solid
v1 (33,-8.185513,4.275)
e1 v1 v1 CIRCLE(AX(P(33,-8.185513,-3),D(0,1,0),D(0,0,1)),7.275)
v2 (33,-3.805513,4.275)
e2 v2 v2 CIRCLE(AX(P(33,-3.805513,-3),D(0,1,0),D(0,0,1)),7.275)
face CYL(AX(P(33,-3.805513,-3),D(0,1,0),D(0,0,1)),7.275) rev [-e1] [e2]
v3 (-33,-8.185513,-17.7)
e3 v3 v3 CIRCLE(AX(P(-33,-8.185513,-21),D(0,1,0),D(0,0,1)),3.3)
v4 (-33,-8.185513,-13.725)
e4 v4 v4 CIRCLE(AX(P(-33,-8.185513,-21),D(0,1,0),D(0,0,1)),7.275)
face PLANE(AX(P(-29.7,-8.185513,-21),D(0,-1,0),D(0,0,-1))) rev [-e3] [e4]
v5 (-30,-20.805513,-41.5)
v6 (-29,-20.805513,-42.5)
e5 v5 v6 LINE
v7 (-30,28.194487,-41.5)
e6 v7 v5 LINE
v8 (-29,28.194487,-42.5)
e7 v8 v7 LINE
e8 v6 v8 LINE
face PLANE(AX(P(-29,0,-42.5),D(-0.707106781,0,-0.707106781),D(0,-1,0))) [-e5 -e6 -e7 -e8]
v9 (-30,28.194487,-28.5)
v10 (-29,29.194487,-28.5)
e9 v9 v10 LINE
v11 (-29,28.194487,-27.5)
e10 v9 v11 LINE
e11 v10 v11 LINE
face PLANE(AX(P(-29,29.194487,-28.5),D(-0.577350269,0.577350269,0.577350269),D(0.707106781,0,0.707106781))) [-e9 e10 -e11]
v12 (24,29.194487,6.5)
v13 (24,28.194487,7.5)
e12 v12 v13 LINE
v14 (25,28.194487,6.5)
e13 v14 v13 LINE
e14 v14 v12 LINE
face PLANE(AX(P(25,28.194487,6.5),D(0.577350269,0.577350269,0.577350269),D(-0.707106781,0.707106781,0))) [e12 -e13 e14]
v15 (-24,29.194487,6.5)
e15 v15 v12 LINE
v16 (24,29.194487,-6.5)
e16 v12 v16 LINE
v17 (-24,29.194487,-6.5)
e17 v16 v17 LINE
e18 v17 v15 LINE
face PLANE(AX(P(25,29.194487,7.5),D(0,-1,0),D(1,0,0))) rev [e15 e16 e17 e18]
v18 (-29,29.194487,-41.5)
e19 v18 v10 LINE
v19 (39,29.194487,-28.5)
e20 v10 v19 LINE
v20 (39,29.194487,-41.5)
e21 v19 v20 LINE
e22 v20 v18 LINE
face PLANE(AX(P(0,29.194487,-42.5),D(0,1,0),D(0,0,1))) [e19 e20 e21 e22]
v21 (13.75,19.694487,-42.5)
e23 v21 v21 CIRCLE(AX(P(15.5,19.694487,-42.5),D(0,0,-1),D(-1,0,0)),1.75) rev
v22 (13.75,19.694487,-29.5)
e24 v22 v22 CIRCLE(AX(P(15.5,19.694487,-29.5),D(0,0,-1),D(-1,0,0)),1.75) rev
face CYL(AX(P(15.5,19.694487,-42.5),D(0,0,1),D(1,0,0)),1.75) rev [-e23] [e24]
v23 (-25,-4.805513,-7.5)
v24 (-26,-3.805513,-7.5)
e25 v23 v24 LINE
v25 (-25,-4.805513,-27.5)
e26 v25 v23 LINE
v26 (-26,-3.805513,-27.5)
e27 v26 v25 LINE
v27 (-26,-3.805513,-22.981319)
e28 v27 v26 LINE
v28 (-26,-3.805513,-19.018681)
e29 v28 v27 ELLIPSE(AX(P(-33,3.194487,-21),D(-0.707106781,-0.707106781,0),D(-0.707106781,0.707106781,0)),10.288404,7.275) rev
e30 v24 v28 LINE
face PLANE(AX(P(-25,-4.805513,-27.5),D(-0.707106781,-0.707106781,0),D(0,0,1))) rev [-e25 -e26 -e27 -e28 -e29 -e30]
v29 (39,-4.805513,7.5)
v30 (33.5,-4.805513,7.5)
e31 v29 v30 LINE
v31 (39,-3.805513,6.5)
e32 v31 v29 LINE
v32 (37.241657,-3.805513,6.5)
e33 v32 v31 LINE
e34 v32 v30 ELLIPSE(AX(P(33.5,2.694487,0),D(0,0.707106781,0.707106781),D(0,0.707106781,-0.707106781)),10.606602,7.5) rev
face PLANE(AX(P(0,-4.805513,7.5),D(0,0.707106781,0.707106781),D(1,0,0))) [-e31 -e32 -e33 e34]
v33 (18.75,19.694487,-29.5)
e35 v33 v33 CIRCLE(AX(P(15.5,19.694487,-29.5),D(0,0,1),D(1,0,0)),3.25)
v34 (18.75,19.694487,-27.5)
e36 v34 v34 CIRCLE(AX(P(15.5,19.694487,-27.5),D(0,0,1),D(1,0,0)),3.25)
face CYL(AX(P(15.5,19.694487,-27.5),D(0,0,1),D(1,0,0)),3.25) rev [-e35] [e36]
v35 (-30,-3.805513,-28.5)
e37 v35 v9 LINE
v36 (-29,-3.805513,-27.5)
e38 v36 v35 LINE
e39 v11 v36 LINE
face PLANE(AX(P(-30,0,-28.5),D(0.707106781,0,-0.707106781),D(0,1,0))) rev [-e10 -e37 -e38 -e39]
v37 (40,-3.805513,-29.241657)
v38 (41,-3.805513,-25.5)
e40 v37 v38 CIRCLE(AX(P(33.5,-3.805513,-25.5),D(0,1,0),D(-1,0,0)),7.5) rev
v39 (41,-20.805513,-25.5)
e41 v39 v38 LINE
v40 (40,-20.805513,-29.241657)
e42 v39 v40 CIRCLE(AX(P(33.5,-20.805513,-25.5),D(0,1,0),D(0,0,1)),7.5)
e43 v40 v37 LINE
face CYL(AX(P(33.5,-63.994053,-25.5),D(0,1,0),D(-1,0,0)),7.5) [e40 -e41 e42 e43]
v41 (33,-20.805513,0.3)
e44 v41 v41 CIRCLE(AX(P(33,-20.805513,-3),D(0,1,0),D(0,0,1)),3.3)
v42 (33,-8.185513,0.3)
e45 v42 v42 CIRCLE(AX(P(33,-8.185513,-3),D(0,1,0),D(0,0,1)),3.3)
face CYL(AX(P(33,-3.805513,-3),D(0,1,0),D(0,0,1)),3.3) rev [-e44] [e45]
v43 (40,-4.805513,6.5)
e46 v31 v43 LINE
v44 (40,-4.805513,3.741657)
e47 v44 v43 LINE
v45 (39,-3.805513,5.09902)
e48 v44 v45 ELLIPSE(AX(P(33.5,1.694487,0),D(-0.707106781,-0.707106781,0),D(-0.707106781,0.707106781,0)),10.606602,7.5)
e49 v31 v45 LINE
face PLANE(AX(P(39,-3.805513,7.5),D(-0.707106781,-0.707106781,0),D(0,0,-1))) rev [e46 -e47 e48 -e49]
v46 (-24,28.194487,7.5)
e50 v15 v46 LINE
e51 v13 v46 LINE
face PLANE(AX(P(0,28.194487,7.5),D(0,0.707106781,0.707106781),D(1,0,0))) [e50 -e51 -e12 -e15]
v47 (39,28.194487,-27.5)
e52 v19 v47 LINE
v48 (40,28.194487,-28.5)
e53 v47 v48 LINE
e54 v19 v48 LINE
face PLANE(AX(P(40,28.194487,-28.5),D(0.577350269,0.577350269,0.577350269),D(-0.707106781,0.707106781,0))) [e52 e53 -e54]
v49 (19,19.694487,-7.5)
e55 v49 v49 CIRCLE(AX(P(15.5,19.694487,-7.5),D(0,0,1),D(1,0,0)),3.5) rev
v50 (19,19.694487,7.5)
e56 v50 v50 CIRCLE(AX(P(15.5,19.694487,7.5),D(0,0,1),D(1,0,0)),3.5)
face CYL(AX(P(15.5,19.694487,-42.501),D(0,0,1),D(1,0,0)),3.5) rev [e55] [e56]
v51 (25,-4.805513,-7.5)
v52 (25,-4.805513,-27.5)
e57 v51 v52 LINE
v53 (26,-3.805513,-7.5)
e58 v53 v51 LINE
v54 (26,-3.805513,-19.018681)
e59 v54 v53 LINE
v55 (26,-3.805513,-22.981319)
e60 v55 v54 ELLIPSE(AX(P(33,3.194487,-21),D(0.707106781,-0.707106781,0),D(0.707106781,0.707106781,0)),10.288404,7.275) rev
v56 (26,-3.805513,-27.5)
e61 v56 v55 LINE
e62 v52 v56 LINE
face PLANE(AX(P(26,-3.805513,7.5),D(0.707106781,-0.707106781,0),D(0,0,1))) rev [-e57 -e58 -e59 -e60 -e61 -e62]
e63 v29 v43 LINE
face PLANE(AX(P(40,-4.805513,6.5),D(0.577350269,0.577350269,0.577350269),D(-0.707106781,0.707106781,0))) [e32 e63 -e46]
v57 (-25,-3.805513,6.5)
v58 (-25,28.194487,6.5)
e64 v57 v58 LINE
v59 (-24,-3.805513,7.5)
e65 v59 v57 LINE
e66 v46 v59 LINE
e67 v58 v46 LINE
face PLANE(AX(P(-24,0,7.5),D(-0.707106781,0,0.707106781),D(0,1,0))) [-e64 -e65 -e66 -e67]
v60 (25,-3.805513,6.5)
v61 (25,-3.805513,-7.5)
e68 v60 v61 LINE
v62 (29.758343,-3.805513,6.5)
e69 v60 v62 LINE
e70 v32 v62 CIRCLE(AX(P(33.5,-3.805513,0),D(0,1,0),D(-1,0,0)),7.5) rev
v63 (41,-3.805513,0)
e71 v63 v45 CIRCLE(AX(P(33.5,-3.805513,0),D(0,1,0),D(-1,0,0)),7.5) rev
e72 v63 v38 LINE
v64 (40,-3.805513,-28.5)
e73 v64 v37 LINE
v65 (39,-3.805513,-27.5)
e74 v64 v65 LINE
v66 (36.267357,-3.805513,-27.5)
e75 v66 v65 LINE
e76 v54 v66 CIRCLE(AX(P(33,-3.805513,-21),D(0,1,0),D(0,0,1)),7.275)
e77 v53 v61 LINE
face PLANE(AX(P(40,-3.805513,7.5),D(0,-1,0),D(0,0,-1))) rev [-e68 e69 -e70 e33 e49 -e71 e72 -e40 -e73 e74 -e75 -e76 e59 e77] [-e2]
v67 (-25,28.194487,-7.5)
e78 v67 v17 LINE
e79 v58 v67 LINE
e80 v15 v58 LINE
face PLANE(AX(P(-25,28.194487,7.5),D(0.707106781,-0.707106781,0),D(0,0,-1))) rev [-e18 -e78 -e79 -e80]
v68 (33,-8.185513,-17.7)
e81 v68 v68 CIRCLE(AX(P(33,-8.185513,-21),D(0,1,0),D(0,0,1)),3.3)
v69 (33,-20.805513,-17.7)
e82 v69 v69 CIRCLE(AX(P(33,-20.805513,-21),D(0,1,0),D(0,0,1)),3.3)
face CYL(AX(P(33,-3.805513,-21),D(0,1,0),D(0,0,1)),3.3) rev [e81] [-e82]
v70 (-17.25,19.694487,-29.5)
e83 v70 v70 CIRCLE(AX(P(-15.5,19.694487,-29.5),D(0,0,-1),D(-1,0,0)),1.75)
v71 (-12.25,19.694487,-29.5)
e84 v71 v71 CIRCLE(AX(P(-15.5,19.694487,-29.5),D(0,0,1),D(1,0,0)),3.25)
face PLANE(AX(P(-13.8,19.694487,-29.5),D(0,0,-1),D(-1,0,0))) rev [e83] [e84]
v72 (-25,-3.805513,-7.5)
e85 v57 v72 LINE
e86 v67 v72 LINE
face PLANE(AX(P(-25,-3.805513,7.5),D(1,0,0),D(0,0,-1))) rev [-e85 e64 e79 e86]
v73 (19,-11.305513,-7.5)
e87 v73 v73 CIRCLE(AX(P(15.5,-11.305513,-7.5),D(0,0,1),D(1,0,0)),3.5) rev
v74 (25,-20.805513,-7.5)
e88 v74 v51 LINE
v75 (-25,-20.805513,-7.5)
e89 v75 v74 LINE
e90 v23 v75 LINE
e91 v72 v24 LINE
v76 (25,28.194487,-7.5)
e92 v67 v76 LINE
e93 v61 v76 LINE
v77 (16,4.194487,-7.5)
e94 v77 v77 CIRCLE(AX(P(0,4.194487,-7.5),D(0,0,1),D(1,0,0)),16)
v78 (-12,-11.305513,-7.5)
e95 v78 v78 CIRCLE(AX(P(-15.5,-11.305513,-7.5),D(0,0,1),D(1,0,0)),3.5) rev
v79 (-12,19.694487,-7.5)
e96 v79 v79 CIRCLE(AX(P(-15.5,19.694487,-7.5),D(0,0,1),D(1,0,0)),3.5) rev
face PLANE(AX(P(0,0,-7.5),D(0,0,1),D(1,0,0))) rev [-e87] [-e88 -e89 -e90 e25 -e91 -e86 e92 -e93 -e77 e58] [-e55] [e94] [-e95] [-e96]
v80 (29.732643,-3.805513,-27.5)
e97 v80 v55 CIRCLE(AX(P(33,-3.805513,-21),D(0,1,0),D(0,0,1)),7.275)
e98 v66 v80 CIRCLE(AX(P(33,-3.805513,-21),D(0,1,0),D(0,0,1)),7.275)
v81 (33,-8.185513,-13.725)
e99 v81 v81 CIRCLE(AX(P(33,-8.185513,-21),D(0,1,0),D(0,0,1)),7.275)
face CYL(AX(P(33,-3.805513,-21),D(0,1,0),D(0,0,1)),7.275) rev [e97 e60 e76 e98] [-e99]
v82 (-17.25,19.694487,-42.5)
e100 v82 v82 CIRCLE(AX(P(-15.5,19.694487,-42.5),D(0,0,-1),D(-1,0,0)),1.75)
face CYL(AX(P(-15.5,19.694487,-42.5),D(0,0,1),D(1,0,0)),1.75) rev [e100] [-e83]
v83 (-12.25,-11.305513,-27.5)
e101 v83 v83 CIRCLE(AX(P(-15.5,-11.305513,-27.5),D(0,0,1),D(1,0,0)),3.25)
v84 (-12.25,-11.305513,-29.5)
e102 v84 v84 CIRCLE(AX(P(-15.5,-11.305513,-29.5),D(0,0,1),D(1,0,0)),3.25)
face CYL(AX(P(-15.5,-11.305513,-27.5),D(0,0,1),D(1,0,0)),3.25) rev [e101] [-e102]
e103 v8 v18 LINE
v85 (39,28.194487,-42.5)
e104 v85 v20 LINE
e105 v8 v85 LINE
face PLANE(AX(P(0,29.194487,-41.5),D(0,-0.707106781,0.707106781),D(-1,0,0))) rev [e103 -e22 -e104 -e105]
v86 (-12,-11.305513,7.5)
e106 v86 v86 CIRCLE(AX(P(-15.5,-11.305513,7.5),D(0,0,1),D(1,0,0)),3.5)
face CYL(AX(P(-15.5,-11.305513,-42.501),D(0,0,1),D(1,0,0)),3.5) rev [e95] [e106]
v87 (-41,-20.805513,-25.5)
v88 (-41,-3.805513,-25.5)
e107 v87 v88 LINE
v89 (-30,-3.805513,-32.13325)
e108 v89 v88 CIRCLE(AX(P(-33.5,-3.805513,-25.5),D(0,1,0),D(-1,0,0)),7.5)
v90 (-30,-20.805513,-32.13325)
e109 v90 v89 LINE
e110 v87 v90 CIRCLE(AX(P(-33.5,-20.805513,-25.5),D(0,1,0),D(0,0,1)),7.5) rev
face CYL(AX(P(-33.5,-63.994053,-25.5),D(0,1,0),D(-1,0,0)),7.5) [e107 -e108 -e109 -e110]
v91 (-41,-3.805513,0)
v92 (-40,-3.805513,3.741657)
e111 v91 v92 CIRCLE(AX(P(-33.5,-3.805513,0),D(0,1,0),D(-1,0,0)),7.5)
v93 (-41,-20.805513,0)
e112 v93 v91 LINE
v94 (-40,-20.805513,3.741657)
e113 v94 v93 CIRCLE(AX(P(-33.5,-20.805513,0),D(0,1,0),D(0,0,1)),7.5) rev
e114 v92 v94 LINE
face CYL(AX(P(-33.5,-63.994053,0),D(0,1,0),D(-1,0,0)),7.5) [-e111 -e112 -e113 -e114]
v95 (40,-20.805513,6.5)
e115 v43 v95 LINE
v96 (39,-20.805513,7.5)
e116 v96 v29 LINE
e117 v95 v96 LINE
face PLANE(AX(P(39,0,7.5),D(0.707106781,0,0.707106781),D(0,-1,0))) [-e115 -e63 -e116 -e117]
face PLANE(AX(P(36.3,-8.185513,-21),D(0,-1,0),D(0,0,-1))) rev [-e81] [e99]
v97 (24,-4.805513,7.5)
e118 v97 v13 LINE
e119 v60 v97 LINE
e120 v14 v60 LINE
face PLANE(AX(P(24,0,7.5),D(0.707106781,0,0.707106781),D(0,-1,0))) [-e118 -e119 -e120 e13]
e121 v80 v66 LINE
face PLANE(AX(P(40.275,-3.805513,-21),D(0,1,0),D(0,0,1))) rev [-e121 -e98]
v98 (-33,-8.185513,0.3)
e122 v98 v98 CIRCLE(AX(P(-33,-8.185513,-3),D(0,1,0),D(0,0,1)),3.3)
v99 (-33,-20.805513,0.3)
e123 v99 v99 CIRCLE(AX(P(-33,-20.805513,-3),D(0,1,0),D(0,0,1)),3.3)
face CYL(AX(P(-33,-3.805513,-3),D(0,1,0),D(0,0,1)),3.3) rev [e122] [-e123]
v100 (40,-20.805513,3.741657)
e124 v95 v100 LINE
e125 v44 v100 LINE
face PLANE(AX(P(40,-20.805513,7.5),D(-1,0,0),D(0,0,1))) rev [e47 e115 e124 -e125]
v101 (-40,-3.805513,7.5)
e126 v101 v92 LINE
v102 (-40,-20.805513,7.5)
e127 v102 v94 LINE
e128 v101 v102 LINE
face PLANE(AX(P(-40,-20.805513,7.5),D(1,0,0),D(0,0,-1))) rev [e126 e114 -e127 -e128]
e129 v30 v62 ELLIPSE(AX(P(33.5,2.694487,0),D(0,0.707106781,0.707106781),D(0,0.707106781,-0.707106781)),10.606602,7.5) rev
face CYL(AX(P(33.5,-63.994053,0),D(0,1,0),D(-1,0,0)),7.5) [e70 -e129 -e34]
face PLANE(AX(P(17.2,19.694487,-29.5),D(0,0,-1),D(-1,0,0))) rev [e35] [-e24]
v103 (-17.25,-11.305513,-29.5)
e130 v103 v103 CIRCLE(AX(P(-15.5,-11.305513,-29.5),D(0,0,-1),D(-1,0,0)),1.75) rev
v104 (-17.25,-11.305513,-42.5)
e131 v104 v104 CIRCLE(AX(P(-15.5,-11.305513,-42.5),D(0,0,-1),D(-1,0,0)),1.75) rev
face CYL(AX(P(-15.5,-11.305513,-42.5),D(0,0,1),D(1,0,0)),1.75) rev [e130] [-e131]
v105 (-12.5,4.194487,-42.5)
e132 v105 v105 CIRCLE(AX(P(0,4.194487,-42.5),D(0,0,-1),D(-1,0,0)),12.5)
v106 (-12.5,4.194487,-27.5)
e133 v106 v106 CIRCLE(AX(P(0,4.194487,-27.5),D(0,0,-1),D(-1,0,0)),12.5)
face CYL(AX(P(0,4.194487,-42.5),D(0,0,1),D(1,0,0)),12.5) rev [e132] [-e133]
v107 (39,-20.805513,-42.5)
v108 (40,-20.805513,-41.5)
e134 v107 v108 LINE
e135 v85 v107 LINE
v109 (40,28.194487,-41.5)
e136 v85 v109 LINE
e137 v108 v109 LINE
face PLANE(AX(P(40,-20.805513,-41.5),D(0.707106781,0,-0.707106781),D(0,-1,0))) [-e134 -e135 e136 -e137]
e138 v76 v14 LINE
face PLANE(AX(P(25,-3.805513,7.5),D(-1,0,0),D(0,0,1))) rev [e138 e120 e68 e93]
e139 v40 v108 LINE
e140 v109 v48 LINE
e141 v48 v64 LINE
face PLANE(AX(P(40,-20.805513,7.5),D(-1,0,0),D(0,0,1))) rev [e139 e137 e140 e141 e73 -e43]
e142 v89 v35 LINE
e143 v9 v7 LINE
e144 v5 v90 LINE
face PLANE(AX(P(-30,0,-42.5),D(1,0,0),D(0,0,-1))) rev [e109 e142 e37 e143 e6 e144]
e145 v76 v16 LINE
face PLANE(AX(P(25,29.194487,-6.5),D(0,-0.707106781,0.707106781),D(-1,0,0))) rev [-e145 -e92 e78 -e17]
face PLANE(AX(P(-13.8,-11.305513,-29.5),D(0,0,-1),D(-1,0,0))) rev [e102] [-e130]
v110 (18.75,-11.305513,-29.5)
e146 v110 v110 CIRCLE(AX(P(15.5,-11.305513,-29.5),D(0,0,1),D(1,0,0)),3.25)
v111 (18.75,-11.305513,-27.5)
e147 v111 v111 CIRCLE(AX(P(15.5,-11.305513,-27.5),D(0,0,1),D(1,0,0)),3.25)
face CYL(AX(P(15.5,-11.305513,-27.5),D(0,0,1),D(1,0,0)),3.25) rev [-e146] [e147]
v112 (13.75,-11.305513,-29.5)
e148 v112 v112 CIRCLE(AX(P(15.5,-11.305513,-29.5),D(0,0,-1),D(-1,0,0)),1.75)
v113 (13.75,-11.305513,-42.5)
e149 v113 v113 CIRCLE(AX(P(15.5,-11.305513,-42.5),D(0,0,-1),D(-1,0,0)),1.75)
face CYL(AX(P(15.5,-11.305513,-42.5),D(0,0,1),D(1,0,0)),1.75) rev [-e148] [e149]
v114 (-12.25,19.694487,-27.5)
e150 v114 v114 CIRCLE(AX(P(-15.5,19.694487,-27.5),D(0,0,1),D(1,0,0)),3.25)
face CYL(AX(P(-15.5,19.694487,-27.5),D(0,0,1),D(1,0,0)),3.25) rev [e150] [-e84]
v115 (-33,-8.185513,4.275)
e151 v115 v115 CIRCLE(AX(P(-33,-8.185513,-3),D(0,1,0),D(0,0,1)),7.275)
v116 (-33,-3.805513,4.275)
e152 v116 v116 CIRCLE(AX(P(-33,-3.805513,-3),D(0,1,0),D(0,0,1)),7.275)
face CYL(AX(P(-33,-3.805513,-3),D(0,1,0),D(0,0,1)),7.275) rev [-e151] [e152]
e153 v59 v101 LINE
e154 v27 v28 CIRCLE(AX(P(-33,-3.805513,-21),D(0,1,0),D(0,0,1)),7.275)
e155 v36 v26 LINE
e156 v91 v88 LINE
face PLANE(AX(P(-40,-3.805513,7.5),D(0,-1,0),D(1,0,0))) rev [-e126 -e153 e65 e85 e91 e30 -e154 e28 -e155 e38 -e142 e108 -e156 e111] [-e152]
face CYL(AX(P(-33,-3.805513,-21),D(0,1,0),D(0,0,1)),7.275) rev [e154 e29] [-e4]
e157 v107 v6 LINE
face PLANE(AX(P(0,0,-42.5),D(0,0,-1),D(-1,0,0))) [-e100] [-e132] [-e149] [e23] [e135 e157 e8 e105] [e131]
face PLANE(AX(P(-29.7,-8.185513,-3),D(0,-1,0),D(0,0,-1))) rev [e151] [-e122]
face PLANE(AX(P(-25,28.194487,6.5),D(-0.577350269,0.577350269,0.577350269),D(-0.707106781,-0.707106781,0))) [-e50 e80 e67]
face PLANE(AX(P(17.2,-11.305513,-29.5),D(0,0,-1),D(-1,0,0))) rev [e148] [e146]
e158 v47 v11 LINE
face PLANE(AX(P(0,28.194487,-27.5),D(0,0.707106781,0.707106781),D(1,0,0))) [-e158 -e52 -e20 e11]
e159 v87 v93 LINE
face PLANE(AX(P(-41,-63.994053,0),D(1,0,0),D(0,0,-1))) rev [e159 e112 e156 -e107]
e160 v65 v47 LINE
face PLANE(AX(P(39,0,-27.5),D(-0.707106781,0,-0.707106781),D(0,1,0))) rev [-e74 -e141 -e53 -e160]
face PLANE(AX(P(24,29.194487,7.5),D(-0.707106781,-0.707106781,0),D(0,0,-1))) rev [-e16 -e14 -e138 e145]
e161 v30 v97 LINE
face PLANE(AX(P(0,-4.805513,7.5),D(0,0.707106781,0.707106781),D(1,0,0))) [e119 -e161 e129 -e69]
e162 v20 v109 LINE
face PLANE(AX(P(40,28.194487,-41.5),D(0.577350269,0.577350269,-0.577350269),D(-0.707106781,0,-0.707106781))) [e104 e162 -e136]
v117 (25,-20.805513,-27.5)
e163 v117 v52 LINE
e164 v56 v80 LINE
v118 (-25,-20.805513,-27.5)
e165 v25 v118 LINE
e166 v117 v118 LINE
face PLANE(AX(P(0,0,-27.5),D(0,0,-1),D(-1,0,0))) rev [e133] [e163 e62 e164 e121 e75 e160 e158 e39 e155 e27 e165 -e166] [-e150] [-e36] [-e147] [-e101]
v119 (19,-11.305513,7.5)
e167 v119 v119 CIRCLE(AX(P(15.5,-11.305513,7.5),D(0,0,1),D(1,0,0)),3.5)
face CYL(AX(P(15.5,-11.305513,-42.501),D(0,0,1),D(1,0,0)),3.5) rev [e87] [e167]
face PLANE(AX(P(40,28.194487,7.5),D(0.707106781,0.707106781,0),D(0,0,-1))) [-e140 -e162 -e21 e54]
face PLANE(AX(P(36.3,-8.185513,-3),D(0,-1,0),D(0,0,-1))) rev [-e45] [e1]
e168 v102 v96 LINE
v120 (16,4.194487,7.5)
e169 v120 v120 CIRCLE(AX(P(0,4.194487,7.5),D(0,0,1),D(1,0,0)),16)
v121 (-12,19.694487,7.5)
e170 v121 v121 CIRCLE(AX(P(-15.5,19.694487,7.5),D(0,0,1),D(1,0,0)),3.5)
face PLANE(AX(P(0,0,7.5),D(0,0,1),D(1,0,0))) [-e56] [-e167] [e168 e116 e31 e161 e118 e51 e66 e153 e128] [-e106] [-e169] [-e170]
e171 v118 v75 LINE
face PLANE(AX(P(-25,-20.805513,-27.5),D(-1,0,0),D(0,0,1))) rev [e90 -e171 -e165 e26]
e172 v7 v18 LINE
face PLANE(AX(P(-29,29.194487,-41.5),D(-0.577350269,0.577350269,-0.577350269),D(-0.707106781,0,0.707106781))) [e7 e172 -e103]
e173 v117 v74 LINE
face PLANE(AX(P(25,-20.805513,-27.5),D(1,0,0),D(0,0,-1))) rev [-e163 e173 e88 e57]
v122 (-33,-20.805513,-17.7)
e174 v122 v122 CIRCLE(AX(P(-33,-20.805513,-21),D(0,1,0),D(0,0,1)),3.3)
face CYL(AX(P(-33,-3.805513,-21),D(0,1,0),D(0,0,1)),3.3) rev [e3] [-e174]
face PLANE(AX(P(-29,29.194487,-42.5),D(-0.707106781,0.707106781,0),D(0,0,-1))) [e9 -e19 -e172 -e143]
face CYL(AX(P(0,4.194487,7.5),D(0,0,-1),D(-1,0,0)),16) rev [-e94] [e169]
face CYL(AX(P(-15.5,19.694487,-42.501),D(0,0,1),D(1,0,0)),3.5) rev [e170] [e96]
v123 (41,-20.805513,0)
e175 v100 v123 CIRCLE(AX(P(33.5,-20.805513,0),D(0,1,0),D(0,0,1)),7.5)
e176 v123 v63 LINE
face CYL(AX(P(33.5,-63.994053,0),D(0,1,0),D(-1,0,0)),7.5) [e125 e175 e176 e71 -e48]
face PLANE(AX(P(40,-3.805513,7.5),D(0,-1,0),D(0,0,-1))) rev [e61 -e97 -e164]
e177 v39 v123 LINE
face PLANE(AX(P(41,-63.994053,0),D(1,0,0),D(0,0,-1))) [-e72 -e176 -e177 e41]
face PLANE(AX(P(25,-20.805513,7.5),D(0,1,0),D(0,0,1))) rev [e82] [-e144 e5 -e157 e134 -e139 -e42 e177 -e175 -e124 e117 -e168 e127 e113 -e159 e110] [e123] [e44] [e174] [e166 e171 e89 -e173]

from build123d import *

# Parameters (mm, degrees)
SKETCH1_R                                   = 16
BOSS_EXTRUDE1_DEPTH                         = 7.5
SKETCH2_W                                   = 15
SKETCH2_H                                   = 17
BOSS_EXTRUDE2_DEPTH                         = 20
SKETCH3_W                                   = 70
SKETCH3_H                                   = 50
SKETCH3_R                                   = 12.5
SKETCH3_R_2                                 = 1.75
BOSS_EXTRUDE4_DEPTH                         = 15
CHAMFER1_SIZE                               = 1
CUT_EXTRUDE1_REACH                          = 72.373
SKETCH4_R                                   = 3.5
CBORE_FOR_M3_CHEESE_HEAD_SCREW3_D           = 3.4
CBORE_FOR_M3_CHEESE_HEAD_SCREW3_CBORE_D     = 6.5
CBORE_FOR_M3_CHEESE_HEAD_SCREW3_CBORE_DEPTH = 2
BOSS_EXTRUDE5_START                         = -17
BOSS_EXTRUDE5_DEPTH                         = 17
CBORE_FOR_M6_HEX_HEAD_BOLT1_AT_2_COUNT      = 2
CBORE_FOR_M6_HEX_HEAD_BOLT1_AT_2_PITCH      = 18
CBORE_FOR_M6_HEX_HEAD_BOLT1_AT_3_COUNT      = 2
CBORE_FOR_M6_HEX_HEAD_BOLT1_AT_3_PITCH      = 68.410525506
CBORE_FOR_M6_HEX_HEAD_BOLT1_AT_4_COUNT      = 2
CBORE_FOR_M6_HEX_HEAD_BOLT1_AT_4_PITCH      = 66


# Read off the part's stored shape, not the designer's step: Boss-Extrude5
with BuildPart() as part:
    # Sketch1 → Boss-Extrude1 (new, symmetric)
    with BuildSketch(Plane.XY):
        Polygon((-25, -20.805513048), (-40, -20.805513048), (-40, -3.805513048), (-25, -3.805513048), (-25, 29.194486952), (25, 29.194486952), (25, -3.805513048), (40, -3.805513048), (40, -20.805513048), (25, -20.805513048), align=None)
        with Locations((0, 4.194486952)):
            Circle(SKETCH1_R, mode=Mode.SUBTRACT)
    extrude(amount=BOSS_EXTRUDE1_DEPTH, both=True)

    # Sketch2 → Boss-Extrude2 (add)
    with BuildSketch(Plane(origin=(0, 0, -7.5), x_dir=(-1, 0, 0), z_dir=(0, 0, -1))):
        with Locations((32.5, -12.305513048)):
            Rectangle(SKETCH2_W, SKETCH2_H)
        with Locations((-32.5, -12.305513048)):
            Rectangle(SKETCH2_W, SKETCH2_H)
    extrude(amount=BOSS_EXTRUDE2_DEPTH)

    # Sketch3 → Boss-Extrude4 (add)
    with BuildSketch(Plane(origin=(0, 0, -27.5), x_dir=(-1, 0, 0), z_dir=(0, 0, -1))):
        with Locations((-5, 4.194486952)):
            Rectangle(SKETCH3_W, SKETCH3_H)
        with Locations((0, 4.194486952)):
            Circle(SKETCH3_R, mode=Mode.SUBTRACT)
        with Locations((15.5, 19.694486952)):
            Circle(SKETCH3_R_2, mode=Mode.SUBTRACT)
        with Locations((-15.5, 19.694486952)):
            Circle(SKETCH3_R_2, mode=Mode.SUBTRACT)
        with Locations((15.5, -11.305513048)):
            Circle(SKETCH3_R_2, mode=Mode.SUBTRACT)
        with Locations((-15.5, -11.305513048)):
            Circle(SKETCH3_R_2, mode=Mode.SUBTRACT)
    extrude(amount=BOSS_EXTRUDE4_DEPTH)

    # Chamfer1
    chamfer1_edges = [part.edges().sort_by_distance(p)[0] for p in [
        (0, 29.194486952, -7.5),
        (-25, 29.194486952, 0),
        (25, 29.194486952, 0),
        (40, -3.805513048, -10),
        (40, -12.305513048, 7.5),
        (32.5, -3.805513048, 7.5),
        (25, 12.694486952, 7.5),
        (-25, -3.805513048, -17.5),
        (0, 29.194486952, 7.5),
        (25, -3.805513048, -17.5),
        (-25, 12.694486952, 7.5),
        (40, 12.694486952, -27.5),
        (5, 29.194486952, -27.5),
        (40, 4.194486952, -42.5),
        (40, 29.194486952, -35),
        (-30, 12.694486952, -27.5),
        (5, 29.194486952, -42.5),
        (-30, 29.194486952, -35),
        (-30, 4.194486952, -42.5),
    ]]
    chamfer(chamfer1_edges, length=CHAMFER1_SIZE)

    # Sketch4 → Cut-Extrude1 (cut, up to next)
    with BuildSketch(Plane.XY.offset(7.5), mode=Mode.PRIVATE) as cut_extrude1_sk1:
        with Locations((-15.5, 19.694486952)):
            Circle(SKETCH4_R)
    cut_extrude1_tool1 = extrude(cut_extrude1_sk1.sketch, amount=-CUT_EXTRUDE1_REACH, mode=Mode.PRIVATE) & part.part
    # Sketch4 → Cut-Extrude1 (cut, up to next)
    with BuildSketch(Plane.XY.offset(7.5), mode=Mode.PRIVATE) as cut_extrude1_sk2:
        with Locations((-15.5, -11.305513048)):
            Circle(SKETCH4_R)
    cut_extrude1_tool2 = extrude(cut_extrude1_sk2.sketch, amount=-CUT_EXTRUDE1_REACH, mode=Mode.PRIVATE) & part.part
    # Sketch4 → Cut-Extrude1 (cut, up to next)
    with BuildSketch(Plane.XY.offset(7.5), mode=Mode.PRIVATE) as cut_extrude1_sk3:
        with Locations((15.5, -11.305513048)):
            Circle(SKETCH4_R)
    cut_extrude1_tool3 = extrude(cut_extrude1_sk3.sketch, amount=-CUT_EXTRUDE1_REACH, mode=Mode.PRIVATE) & part.part
    # Sketch4 → Cut-Extrude1 (cut, up to next)
    with BuildSketch(Plane.XY.offset(7.5), mode=Mode.PRIVATE) as cut_extrude1_sk4:
        with Locations((15.5, 19.694486952)):
            Circle(SKETCH4_R)
    cut_extrude1_tool4 = extrude(cut_extrude1_sk4.sketch, amount=-CUT_EXTRUDE1_REACH, mode=Mode.PRIVATE) & part.part
    add(cut_extrude1_tool1.solids().sort_by_distance((-15.5, 19.694487, 7.5))[0], mode=Mode.SUBTRACT)
    add(cut_extrude1_tool2.solids().sort_by_distance((-15.5, -11.305513, 7.5))[0], mode=Mode.SUBTRACT)
    add(cut_extrude1_tool3.solids().sort_by_distance((15.5, -11.305513, 7.5))[0], mode=Mode.SUBTRACT)
    add(cut_extrude1_tool4.solids().sort_by_distance((15.5, 19.694487, 7.5))[0], mode=Mode.SUBTRACT)

    # CBORE for M3 Cheese Head Screw3 (through all)
    with Locations(Plane(origin=(-15.5, 19.694486952, -27.5), x_dir=(1, 0, 0), z_dir=(0, 0, 1))):
        with Locations((0, 0), (31, 0), (0, -31), (31, -31)):
            CounterBoreHole(CBORE_FOR_M3_CHEESE_HEAD_SCREW3_D / 2, CBORE_FOR_M3_CHEESE_HEAD_SCREW3_CBORE_D / 2, CBORE_FOR_M3_CHEESE_HEAD_SCREW3_CBORE_DEPTH)

    # Boss-Extrude5 outline → Boss-Extrude5 (add)
    with BuildSketch(Plane(origin=(0, -3.805513048, 0), x_dir=(1, 0, 0), z_dir=(0, 1, 0)).offset(BOSS_EXTRUDE5_START)):
        with BuildLine():
            Line((-40, -3.741657387), (-40, 27.5))
            Line((-40, 27.5), (-30, 27.5))
            Line((-30, 27.5), (-30, 32.133249581))
            ThreePointArc((-30, 32.133249581), (-37.372983346, 31.922616289), (-41, 25.5))
            Line((-41, 25.5), (-41, 0))
            ThreePointArc((-41, 0), (-40.745688373, -1.936491673), (-40, -3.741657387))
        make_face()
        with BuildLine():
            Line((41, 0), (41, 25.5))
            ThreePointArc((41, 25.5), (28.196699141, 30.803300859), (33.5, 18))
            Line((33.5, 18), (33.5, 7.5))
            ThreePointArc((33.5, 7.5), (26.254311627, 1.936491673), (29.758342613, -6.5))
            ThreePointArc((29.758342613, -6.5), (33.5, -7.5), (37.241657387, -6.5))
            ThreePointArc((37.241657387, -6.5), (39.992781777, -3.754168989), (41, 0))
        make_face()
    extrude(amount=BOSS_EXTRUDE5_DEPTH)

    # Sketch9 → CBORE for M6 Hex Head Bolt1 (revolve, cut)
    with BuildSketch(Plane(origin=(-33, -3.805513048, -3), x_dir=(0, 0, 1), z_dir=(1, 0, 0))):
        Polygon((0, 0), (0, 17), (3.3, 17), (3.3, 4.38), (7.275, 4.38), (7.275, 0), align=None)
    cbore_for_m6_hex_head_bolt1 = revolve(axis=Axis((-33, 2.544486952, -3), (0, -1, 0)), mode=Mode.SUBTRACT)

    # CBORE for M6 Hex Head Bolt1 at 2: CBORE for M6 Hex Head Bolt1 ×2
    with Locations(*[(0, 0, -i * CBORE_FOR_M6_HEX_HEAD_BOLT1_AT_2_PITCH) for i in range(1, CBORE_FOR_M6_HEX_HEAD_BOLT1_AT_2_COUNT)]):
        add(cbore_for_m6_hex_head_bolt1, mode=Mode.SUBTRACT)

    # CBORE for M6 Hex Head Bolt1 at 3: CBORE for M6 Hex Head Bolt1 ×2
    with Locations(*[Vector(0.9647638212377322, 0, -0.26311740579210874) * (i * CBORE_FOR_M6_HEX_HEAD_BOLT1_AT_3_PITCH) for i in range(1, CBORE_FOR_M6_HEX_HEAD_BOLT1_AT_3_COUNT)]):
        add(cbore_for_m6_hex_head_bolt1, mode=Mode.SUBTRACT)

    # CBORE for M6 Hex Head Bolt1 at 4: CBORE for M6 Hex Head Bolt1 ×2
    with Locations(*[(i * CBORE_FOR_M6_HEX_HEAD_BOLT1_AT_4_PITCH, 0, 0) for i in range(1, CBORE_FOR_M6_HEX_HEAD_BOLT1_AT_4_COUNT)]):
        add(cbore_for_m6_hex_head_bolt1, mode=Mode.SUBTRACT)


solid = part.part
